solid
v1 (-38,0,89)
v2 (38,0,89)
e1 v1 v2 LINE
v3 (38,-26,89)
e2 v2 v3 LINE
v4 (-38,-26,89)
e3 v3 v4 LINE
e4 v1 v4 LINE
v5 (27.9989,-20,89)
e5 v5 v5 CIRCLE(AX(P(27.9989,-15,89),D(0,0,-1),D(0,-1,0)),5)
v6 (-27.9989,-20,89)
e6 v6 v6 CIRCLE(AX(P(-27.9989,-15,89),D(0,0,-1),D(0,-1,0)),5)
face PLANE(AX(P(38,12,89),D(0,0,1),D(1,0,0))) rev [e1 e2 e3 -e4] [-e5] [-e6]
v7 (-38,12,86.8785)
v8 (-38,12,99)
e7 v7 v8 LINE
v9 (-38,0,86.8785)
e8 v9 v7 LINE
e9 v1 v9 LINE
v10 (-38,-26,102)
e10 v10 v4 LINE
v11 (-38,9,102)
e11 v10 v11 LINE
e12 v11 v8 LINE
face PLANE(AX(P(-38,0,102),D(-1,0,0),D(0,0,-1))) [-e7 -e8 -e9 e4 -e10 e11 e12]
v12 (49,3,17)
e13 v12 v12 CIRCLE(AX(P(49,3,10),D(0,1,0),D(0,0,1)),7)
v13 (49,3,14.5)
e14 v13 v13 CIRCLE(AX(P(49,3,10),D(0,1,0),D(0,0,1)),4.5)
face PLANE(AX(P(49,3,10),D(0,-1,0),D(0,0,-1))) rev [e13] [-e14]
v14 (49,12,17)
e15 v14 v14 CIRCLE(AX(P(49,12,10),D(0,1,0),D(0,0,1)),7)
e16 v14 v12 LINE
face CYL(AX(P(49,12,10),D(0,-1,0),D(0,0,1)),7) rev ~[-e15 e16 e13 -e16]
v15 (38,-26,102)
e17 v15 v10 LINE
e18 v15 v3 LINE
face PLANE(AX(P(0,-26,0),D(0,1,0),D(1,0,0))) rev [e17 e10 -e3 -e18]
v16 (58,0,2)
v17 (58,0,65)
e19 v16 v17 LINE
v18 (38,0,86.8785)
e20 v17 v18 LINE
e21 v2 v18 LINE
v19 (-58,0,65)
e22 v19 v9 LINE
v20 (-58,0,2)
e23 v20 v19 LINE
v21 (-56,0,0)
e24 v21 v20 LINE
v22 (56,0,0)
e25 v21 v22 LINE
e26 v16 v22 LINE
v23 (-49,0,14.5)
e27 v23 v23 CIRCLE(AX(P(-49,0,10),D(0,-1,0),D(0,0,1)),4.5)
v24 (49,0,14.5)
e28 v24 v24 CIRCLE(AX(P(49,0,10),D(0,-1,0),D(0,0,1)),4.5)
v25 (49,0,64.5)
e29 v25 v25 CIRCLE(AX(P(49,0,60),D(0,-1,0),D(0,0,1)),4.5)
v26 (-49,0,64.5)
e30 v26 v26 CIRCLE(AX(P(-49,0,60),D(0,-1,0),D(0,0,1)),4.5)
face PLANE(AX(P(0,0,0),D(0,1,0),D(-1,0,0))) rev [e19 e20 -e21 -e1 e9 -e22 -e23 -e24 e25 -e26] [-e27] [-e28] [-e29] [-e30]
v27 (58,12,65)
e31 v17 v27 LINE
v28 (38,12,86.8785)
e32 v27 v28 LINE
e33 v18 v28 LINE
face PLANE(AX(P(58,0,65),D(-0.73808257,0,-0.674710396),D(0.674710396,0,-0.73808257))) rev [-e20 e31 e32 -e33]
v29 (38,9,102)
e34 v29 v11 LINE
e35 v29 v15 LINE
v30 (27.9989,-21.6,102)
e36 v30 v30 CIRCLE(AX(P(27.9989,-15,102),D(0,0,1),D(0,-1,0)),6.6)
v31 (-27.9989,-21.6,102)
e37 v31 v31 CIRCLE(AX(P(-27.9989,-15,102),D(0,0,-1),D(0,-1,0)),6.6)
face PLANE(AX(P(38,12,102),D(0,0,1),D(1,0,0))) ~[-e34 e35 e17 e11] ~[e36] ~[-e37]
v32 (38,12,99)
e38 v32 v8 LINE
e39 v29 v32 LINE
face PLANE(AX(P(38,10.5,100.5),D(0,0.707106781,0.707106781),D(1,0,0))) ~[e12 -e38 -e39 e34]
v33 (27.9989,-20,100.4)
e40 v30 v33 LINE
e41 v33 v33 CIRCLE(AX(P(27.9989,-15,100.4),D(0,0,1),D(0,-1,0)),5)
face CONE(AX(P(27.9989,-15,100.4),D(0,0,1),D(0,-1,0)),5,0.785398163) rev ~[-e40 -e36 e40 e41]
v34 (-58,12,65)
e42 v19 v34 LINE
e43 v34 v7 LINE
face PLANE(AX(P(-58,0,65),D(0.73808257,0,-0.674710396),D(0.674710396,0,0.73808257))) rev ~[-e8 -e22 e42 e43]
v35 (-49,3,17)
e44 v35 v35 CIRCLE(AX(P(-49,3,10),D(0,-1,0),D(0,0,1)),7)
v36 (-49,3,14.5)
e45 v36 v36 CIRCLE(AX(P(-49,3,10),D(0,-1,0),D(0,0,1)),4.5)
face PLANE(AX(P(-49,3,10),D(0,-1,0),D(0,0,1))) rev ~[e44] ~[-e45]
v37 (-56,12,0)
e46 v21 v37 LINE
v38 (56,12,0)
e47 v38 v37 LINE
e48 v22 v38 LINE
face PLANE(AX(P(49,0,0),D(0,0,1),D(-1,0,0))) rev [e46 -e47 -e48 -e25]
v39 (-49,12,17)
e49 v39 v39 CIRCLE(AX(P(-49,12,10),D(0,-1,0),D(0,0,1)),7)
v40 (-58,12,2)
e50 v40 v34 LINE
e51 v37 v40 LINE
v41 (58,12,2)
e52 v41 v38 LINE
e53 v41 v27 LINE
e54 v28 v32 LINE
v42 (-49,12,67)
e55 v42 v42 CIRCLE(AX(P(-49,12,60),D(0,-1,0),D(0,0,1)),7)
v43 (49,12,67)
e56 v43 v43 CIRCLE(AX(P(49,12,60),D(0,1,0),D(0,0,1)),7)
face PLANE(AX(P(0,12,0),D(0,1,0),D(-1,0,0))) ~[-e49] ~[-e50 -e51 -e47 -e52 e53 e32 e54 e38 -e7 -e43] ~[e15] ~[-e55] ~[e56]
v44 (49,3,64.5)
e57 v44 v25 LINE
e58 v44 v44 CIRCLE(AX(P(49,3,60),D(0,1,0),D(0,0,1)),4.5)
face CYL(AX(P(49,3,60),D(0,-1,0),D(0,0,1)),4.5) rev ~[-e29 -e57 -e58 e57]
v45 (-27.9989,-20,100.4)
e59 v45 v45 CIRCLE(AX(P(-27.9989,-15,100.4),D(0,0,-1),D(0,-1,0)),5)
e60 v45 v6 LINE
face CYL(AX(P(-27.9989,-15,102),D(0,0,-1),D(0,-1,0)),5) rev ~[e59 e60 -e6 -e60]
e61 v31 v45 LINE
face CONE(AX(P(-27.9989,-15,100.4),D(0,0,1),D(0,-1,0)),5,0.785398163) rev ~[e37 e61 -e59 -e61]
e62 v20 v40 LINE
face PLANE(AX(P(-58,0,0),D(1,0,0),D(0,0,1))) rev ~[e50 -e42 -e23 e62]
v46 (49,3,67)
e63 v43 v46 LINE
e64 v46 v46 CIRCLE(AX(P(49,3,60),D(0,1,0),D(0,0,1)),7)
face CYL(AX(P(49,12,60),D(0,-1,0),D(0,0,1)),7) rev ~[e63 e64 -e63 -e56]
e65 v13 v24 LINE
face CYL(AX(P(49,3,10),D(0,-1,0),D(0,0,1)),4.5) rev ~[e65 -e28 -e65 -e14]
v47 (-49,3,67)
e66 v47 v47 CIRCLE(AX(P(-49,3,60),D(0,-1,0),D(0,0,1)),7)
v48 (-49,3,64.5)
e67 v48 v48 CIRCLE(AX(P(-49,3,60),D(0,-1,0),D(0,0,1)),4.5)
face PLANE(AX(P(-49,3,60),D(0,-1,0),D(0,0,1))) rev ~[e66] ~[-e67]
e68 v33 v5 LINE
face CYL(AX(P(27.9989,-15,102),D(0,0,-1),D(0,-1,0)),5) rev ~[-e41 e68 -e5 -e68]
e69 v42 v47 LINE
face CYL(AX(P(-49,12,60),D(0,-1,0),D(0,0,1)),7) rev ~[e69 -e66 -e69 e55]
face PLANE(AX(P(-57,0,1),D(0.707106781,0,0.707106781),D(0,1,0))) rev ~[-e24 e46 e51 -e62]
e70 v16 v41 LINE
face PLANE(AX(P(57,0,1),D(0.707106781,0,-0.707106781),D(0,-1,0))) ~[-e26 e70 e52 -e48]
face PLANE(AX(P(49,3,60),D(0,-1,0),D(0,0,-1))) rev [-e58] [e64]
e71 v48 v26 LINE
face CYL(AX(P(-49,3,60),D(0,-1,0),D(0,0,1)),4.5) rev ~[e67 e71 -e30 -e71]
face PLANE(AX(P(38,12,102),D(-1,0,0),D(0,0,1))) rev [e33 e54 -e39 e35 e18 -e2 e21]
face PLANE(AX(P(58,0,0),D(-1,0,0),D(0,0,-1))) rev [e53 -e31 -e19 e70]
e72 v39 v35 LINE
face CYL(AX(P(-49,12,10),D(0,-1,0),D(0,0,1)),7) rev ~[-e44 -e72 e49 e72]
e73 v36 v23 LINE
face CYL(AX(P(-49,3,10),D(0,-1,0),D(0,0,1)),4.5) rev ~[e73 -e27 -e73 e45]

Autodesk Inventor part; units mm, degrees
ref_plane "YZ Plane" through (0, 0, 0) normal (1, 0, 0) x (0, 1, 0)
ref_plane "XZ Plane" through (0, 0, 0) normal (0, 1, 0) x (-1, 0, 0)
ref_plane "XY Plane" through (0, 0, 0) normal (0, 0, 1) x (1, 0, 0)
sketch "Эскиз1" plane through (0, 0, 0) normal (0, 1, 0) x (-1, 0, 0)
  line L0 (0, 0) -> (58, 0)
  line L1 (58, 0) -> (58, 65)
  line L2 (58, 65) -> (38, 86.8785)
  line L3 (0, 0) -> (0, 102)
  line L4 (0, 102) -> (38, 102)
  line L5 (38, 102) -> (38, 86.8785)
  line L6 (0, 0) -> (49, 0)
  line L7 (49, 0) -> (49, 10)
  line L8 (49, 10) -> (49, 60)
  dimension "d8" = 58
  dimension "d9" = 65
  dimension "d10" = 102
  dimension "d11" = 38
  dimension "d12" = 49
  dimension "d13" = 10
  dimension "d14" = 50
extrude "Выдавливание1" add sketch "Эскиз1" along normal blind 12
sketch "Эскиз3" plane through (0, 12, 0) normal (0, 1, 0) x (1, 0, 0)
  line L0 (-38, -102) -> (0, -102) projected
  line L1 (-38, -102) -> (-38, -89)
  line L2 (-38, -86.8785) -> (-38, -102) projected
  line L3 (-38, -89) -> (0, -89)
  line L4 (0, -89) -> (0, -102)
  point P0 (0, 0)
  dimension "d17" = 13
extrude "Выдавливание2" add sketch "Эскиз3" against normal blind 38
sketch "Эскиз4" plane through (0, 12, 0) normal (0, 1, 0) x (1, 0, 0)
  line L0 (0, 0) -> (-58, 0) projected
  line L1 (0, 0) -> (-49, 0)
  line L2 (-49, 0) -> (-49, -10)
  line L3 (-49, -10) -> (-49, -60)
  dimension "d20" = 49
  dimension "d21" = 10
  dimension "d22" = 50
hole "Отверстие1" at (-49, 12, 60) at (-49, 12, 10) direction (0, -1, 0) diameter 9 end through all counterbore diameter 14 counterbore depth 9
sketch "Эскиз6" plane through (-38, 12, 102) normal (0, 0, 1) x (1, 0, 0)
  line L0 (38, -37.7549) -> (10.0011, -38)
  line L1 (0, -38) -> (38, -38) projected
  line L2 (10.0011, -38) -> (10.0011, -27)
  point P0 (38, -12)
  dimension "d39" = 28
  dimension "d40" = 11
hole "Отверстие3" at (-27.9989, -15, 102) direction (0, 0, -1) diameter 10 end through all
mirror "Зеркальное отражение1" about plane through (0, 0, 102) normal (1, 0, 0) of "Выдавливание2", "Выдавливание1", "Отверстие1", "Отверстие3"
thread "Резьба1" size "M10x1.5" class "6H" standard "ANSI Metric M Profile" full length
thread "Резьба2" size "M10x1.5" class "6H" standard "ANSI Metric M Profile" full length
chamfer "Фаска1" distance 1.6 angle 45 2 edges at (27.9989, -10, 102) (-27.9989, -10, 102)
chamfer "Фаска2" distance 3 angle 45 1 edges at (0, 12, 102)
chamfer "Фаска3" distance 2 angle 45 2 edges at (58, 6, 0) (-58, 6, 0)
properties part number "Крышка-6"
